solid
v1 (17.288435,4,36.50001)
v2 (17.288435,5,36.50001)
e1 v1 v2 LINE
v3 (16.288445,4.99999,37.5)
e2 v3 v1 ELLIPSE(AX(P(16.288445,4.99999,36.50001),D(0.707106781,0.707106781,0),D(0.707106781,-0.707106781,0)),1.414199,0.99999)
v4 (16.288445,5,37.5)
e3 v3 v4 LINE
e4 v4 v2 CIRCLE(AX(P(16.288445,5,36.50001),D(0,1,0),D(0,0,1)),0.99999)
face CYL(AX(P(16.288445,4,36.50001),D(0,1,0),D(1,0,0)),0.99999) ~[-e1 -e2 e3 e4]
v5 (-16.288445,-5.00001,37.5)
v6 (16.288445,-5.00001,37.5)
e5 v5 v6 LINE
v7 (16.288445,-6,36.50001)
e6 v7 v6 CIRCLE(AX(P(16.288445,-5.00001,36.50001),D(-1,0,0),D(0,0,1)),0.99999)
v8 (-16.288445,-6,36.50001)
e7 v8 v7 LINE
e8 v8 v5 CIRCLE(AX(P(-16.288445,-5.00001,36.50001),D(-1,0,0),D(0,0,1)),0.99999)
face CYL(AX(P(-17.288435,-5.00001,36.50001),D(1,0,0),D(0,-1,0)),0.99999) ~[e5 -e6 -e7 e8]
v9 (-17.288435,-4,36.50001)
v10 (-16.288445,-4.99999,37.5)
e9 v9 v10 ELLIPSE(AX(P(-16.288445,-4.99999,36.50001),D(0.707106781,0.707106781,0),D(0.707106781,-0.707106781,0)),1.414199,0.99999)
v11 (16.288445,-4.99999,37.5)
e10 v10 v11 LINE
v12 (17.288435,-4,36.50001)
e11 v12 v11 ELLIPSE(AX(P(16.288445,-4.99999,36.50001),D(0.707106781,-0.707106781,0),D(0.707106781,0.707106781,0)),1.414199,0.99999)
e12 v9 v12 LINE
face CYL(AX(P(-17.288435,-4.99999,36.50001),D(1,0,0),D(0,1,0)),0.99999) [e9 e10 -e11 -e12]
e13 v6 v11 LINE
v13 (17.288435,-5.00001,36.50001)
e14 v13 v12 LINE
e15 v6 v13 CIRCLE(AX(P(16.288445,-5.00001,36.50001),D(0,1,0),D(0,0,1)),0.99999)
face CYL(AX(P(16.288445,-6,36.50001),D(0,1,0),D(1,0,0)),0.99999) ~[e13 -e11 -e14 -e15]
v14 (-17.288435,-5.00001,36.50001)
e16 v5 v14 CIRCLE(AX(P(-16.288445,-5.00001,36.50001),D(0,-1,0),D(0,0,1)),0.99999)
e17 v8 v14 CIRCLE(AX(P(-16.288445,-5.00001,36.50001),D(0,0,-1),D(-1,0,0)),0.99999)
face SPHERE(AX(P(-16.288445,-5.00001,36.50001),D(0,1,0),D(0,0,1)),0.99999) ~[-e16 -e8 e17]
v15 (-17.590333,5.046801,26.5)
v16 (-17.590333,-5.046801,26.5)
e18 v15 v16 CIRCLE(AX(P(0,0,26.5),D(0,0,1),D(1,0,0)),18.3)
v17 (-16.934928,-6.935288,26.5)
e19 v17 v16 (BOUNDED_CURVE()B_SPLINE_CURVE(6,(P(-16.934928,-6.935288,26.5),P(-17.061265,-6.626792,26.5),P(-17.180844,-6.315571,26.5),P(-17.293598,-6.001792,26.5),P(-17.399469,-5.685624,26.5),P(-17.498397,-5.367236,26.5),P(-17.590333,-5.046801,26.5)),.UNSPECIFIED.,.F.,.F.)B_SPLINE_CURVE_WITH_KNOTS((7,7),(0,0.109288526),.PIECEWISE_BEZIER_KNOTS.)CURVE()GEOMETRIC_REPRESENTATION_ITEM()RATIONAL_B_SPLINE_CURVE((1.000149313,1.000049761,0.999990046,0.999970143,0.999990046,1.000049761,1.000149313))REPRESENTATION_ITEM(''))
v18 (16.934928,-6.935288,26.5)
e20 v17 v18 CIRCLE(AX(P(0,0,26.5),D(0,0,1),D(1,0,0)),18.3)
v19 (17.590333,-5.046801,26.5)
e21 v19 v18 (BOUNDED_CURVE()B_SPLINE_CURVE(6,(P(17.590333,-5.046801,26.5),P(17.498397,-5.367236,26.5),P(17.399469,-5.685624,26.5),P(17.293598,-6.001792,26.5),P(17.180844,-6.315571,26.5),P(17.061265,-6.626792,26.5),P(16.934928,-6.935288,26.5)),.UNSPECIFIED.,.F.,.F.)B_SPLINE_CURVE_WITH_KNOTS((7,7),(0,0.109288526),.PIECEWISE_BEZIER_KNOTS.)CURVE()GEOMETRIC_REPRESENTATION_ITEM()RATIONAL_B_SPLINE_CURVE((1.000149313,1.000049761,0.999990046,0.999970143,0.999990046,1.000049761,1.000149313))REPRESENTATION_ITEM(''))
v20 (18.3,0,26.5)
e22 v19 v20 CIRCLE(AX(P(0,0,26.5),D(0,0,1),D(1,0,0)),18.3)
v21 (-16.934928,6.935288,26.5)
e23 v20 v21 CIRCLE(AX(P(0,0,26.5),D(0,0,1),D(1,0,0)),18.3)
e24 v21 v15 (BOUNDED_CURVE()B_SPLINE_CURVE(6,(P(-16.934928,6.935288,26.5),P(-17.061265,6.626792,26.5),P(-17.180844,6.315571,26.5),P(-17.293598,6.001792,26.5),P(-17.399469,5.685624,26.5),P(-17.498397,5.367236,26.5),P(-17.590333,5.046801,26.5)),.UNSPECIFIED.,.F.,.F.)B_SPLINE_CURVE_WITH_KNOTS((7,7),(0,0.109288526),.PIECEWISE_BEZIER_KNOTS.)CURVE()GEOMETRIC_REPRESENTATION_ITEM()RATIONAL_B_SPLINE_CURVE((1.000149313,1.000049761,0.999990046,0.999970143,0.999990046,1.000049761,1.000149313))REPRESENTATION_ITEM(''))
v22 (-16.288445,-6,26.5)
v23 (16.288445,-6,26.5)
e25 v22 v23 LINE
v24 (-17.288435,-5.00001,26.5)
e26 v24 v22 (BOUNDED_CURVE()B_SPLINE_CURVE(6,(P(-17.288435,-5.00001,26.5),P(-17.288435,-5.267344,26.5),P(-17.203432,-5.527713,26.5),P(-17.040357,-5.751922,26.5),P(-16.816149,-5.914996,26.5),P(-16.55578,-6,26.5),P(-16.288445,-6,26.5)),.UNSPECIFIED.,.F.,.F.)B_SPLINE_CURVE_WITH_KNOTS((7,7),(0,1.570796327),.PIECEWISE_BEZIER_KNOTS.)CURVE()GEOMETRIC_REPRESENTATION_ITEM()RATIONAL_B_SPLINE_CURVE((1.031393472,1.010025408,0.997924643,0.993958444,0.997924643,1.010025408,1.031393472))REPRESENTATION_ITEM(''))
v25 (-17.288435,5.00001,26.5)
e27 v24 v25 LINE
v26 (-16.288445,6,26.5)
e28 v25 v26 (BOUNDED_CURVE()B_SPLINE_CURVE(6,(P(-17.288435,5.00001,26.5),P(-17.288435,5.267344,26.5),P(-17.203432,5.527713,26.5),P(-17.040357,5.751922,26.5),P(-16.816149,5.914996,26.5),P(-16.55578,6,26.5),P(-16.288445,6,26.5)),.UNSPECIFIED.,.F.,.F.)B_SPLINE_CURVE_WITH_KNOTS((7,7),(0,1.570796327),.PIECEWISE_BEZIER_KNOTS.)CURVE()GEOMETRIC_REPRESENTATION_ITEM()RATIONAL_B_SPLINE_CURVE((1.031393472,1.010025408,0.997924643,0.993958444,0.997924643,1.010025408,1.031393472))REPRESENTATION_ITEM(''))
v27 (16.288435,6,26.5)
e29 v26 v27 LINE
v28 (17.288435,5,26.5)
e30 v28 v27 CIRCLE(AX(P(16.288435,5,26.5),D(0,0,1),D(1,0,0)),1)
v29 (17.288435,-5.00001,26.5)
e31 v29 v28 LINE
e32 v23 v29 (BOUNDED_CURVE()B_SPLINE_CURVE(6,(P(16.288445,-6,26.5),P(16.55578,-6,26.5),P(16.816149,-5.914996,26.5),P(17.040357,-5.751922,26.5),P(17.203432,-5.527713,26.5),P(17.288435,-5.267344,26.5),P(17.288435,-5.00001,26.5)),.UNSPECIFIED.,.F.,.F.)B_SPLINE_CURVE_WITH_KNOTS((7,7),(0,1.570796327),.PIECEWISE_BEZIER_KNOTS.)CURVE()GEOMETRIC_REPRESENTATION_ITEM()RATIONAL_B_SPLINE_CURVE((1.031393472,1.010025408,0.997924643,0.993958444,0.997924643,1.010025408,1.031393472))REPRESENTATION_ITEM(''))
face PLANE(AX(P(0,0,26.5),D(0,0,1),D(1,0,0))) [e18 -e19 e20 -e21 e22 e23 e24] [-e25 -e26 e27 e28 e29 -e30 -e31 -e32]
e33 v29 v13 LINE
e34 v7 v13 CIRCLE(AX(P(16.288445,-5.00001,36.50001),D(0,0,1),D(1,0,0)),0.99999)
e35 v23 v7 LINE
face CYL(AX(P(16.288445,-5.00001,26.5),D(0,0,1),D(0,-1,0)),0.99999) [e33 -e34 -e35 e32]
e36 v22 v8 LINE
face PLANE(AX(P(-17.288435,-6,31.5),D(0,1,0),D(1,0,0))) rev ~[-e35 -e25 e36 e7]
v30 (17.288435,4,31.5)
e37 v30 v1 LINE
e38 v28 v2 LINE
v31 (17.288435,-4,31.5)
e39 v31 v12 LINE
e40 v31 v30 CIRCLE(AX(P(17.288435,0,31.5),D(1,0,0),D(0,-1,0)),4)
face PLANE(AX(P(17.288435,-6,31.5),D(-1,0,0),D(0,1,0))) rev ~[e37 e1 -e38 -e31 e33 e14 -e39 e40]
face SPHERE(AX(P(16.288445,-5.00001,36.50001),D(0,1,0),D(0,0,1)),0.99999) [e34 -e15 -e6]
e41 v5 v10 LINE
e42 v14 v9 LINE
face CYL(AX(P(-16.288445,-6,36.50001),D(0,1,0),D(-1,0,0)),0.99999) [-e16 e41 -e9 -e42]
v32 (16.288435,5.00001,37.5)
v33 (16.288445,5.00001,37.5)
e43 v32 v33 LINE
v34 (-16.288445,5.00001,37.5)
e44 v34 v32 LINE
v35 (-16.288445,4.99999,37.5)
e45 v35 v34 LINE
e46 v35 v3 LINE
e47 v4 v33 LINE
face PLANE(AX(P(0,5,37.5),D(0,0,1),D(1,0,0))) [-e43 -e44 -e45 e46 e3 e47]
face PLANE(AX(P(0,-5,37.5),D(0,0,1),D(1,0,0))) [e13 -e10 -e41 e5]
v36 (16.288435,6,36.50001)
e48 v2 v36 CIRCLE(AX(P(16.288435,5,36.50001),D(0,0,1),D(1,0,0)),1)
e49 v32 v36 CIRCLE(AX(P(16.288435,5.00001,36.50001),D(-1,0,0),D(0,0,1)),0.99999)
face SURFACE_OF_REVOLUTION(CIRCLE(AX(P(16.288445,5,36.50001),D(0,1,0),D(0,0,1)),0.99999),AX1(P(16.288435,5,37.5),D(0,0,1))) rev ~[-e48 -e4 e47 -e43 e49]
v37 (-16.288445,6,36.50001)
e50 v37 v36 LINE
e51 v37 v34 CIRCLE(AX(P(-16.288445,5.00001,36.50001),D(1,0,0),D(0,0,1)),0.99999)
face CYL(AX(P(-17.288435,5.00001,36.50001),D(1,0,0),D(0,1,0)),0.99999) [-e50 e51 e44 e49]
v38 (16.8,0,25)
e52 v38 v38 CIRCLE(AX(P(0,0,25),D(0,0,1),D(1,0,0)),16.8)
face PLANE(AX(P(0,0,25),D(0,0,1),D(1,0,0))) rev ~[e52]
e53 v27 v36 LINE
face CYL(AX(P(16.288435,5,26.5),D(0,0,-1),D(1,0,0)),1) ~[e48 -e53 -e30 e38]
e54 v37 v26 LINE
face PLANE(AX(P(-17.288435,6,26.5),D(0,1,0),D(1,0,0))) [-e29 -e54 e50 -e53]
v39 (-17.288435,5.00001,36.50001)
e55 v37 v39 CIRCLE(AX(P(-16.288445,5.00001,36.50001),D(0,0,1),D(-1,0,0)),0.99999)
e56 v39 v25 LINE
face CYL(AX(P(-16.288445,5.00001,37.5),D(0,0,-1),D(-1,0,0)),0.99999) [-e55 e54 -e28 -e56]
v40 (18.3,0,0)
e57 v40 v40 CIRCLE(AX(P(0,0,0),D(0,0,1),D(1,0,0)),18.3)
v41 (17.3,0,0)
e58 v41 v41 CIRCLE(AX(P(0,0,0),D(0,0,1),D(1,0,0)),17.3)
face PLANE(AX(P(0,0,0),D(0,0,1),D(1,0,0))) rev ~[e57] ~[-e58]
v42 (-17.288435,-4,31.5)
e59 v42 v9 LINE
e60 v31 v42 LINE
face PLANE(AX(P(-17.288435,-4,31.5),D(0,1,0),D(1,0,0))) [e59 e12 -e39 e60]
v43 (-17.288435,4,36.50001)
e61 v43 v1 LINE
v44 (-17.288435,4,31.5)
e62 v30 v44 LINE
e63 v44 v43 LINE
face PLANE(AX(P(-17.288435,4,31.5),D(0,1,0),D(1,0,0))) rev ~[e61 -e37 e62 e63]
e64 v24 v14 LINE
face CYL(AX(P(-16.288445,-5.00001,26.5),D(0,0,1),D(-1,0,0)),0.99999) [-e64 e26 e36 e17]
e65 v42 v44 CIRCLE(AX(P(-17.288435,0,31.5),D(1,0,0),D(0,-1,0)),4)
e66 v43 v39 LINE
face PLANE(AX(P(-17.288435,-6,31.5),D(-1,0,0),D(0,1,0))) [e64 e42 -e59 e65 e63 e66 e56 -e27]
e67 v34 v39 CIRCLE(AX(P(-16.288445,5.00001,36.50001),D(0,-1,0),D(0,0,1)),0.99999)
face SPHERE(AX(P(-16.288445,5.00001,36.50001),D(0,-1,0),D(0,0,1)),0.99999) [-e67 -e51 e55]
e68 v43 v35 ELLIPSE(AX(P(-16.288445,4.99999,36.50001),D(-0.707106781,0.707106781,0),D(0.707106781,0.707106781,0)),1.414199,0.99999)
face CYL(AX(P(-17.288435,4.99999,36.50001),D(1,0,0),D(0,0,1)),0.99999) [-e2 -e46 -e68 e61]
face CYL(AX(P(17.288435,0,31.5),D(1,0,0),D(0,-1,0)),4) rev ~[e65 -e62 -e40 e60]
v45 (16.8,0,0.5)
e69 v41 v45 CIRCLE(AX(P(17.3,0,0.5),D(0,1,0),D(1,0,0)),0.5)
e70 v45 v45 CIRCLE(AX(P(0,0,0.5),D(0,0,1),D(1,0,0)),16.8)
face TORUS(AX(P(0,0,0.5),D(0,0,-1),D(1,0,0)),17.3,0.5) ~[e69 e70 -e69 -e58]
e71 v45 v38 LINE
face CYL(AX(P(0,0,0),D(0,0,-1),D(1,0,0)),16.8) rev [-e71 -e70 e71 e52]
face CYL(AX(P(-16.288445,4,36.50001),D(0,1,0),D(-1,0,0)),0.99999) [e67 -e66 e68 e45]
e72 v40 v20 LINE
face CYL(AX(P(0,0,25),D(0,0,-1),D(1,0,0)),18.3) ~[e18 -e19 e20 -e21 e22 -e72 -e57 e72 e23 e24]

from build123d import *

# Parameters (mm, degrees)
F0_R         = 18.3
F0_R_2       = 16.8
F1_DEPTH     = 25
F2_R         = 18.3
F2_R_2       = 16.8
F3_DEPTH     = 1.5
F4_W         = 34.5768708821
F4_H         = 12
F5_DEPTH     = 5
F7_DEPTH     = 36
F8_W         = 34.5768708821
F8_H         = 2
F7_FACE_W    = 34.5768708821
F7_FACE_H    = 2
F9_DEPTH     = 6
F10_R        = 0.99999
F11_T1_DEPTH = 11
F11_T4_ANGLE = 90
F12_R        = 0.5


# Not quite as in the source:
# - a fillet or chamfer that OpenCascade refuses, or shapes differently, is made with other operations: its cross-section is extruded or revolved along the edge and cut away or added
# - a fillet or chamfer is up to 0.001 mm smaller than in the source, because OpenCascade refuses the exact size


with BuildPart() as f1:
    # F0 (on Top) → F1 (new body)
    with BuildSketch(Plane.XY):
        Circle(F0_R)
        Circle(F0_R_2, mode=Mode.SUBTRACT)
    extrude(amount=F1_DEPTH)

    # F2 (on face) → F3 (join)
    with BuildSketch(Plane.XY.offset(25)):
        Circle(F2_R)
        Circle(F2_R_2, mode=Mode.SUBTRACT)
        Circle(F2_R_2)
    extrude(amount=F3_DEPTH)

    # F4 (on face) → F5 (join)
    with BuildSketch(Plane.XY.offset(26.5)):
        Rectangle(F4_W, F4_H)
    extrude(amount=F5_DEPTH)

    # F6 (on face) → F7 (cut)
    with BuildSketch(Plane.YZ.offset(17.2884354411)):
        with BuildLine():
            ThreePointArc((-4, 31.5), (0, 27.5), (4, 31.5))
            Line((4, 31.5), (-4, 31.5))
        make_face()
    extrude(amount=-F7_DEPTH, mode=Mode.SUBTRACT)

    # F8 (on face) + F7_face (on face) → F9 (join)
    with BuildSketch(Plane.XY.offset(31.5)):
        with Locations((0, -5)):
            Rectangle(F8_W, F8_H)
    with BuildSketch(Plane(origin=(0, -5, 31.5), x_dir=(1, 0, 0), z_dir=(0, 0, 1))):
        with Locations((0, 10)):
            Rectangle(F7_FACE_W, F7_FACE_H)
    extrude(amount=F9_DEPTH)

    # F10 (radius 1 in the source; OpenCascade refuses exactly that, so slightly less here)
    f10_edges = [f1.edges().sort_by_distance(p)[0] for p in [
        (17.288435, -5, 37.5),
        (0, -4, 37.5),
        (-17.288435, -5, 37.5),
        (0, -6, 37.5),
        (-17.288435, 5, 37.5),
        (0, 4, 37.5),
        (17.288435, 5, 37.5),
        (0, 6, 37.5),
        (17.288435, -6, 32),
        (-17.288435, -6, 32),
        (-17.288435, 6, 32),
    ]]
    fillet(f10_edges, radius=F10_R)

    # F11: fillet of radius 1 on 1 edges, made by hand

    # F11_s2 → F11_t1 (cut)
    with BuildSketch(Plane.XY.offset(26.5)):
        with BuildLine():
            ThreePointArc((17.2884354411, 5), (16.9955422223, 5.7071067812), (16.2884354411, 6))
            Line((16.2884354411, 6), (17.2884354411, 6))
            Line((17.2884354411, 6), (17.2884354411, 5))
        make_face()
    extrude(amount=F11_T1_DEPTH, mode=Mode.SUBTRACT)

    # F11_s3 → F11_t4 (revolve, cut)
    with BuildSketch(Plane.XZ.offset(-5)):
        with BuildLine():
            ThreePointArc((16.2884454411, 37.5), (16.9955451512, 37.2071097101), (17.2884354411, 36.50001))
            Line((17.2884354411, 36.50001), (17.2884354411, 37.5))
            Line((17.2884354411, 37.5), (16.2884454411, 37.5))
        make_face()
    revolve(axis=Axis((16.2884354411, 5, 37.5), (0, 0, 1)), revolution_arc=F11_T4_ANGLE, mode=Mode.SUBTRACT)

    # F12
    f12_edges = [f1.edges().sort_by_distance(p)[0] for p in [
        (-16.8, 0, 0),
    ]]
    fillet(f12_edges, radius=F12_R)


solid = f1.part
